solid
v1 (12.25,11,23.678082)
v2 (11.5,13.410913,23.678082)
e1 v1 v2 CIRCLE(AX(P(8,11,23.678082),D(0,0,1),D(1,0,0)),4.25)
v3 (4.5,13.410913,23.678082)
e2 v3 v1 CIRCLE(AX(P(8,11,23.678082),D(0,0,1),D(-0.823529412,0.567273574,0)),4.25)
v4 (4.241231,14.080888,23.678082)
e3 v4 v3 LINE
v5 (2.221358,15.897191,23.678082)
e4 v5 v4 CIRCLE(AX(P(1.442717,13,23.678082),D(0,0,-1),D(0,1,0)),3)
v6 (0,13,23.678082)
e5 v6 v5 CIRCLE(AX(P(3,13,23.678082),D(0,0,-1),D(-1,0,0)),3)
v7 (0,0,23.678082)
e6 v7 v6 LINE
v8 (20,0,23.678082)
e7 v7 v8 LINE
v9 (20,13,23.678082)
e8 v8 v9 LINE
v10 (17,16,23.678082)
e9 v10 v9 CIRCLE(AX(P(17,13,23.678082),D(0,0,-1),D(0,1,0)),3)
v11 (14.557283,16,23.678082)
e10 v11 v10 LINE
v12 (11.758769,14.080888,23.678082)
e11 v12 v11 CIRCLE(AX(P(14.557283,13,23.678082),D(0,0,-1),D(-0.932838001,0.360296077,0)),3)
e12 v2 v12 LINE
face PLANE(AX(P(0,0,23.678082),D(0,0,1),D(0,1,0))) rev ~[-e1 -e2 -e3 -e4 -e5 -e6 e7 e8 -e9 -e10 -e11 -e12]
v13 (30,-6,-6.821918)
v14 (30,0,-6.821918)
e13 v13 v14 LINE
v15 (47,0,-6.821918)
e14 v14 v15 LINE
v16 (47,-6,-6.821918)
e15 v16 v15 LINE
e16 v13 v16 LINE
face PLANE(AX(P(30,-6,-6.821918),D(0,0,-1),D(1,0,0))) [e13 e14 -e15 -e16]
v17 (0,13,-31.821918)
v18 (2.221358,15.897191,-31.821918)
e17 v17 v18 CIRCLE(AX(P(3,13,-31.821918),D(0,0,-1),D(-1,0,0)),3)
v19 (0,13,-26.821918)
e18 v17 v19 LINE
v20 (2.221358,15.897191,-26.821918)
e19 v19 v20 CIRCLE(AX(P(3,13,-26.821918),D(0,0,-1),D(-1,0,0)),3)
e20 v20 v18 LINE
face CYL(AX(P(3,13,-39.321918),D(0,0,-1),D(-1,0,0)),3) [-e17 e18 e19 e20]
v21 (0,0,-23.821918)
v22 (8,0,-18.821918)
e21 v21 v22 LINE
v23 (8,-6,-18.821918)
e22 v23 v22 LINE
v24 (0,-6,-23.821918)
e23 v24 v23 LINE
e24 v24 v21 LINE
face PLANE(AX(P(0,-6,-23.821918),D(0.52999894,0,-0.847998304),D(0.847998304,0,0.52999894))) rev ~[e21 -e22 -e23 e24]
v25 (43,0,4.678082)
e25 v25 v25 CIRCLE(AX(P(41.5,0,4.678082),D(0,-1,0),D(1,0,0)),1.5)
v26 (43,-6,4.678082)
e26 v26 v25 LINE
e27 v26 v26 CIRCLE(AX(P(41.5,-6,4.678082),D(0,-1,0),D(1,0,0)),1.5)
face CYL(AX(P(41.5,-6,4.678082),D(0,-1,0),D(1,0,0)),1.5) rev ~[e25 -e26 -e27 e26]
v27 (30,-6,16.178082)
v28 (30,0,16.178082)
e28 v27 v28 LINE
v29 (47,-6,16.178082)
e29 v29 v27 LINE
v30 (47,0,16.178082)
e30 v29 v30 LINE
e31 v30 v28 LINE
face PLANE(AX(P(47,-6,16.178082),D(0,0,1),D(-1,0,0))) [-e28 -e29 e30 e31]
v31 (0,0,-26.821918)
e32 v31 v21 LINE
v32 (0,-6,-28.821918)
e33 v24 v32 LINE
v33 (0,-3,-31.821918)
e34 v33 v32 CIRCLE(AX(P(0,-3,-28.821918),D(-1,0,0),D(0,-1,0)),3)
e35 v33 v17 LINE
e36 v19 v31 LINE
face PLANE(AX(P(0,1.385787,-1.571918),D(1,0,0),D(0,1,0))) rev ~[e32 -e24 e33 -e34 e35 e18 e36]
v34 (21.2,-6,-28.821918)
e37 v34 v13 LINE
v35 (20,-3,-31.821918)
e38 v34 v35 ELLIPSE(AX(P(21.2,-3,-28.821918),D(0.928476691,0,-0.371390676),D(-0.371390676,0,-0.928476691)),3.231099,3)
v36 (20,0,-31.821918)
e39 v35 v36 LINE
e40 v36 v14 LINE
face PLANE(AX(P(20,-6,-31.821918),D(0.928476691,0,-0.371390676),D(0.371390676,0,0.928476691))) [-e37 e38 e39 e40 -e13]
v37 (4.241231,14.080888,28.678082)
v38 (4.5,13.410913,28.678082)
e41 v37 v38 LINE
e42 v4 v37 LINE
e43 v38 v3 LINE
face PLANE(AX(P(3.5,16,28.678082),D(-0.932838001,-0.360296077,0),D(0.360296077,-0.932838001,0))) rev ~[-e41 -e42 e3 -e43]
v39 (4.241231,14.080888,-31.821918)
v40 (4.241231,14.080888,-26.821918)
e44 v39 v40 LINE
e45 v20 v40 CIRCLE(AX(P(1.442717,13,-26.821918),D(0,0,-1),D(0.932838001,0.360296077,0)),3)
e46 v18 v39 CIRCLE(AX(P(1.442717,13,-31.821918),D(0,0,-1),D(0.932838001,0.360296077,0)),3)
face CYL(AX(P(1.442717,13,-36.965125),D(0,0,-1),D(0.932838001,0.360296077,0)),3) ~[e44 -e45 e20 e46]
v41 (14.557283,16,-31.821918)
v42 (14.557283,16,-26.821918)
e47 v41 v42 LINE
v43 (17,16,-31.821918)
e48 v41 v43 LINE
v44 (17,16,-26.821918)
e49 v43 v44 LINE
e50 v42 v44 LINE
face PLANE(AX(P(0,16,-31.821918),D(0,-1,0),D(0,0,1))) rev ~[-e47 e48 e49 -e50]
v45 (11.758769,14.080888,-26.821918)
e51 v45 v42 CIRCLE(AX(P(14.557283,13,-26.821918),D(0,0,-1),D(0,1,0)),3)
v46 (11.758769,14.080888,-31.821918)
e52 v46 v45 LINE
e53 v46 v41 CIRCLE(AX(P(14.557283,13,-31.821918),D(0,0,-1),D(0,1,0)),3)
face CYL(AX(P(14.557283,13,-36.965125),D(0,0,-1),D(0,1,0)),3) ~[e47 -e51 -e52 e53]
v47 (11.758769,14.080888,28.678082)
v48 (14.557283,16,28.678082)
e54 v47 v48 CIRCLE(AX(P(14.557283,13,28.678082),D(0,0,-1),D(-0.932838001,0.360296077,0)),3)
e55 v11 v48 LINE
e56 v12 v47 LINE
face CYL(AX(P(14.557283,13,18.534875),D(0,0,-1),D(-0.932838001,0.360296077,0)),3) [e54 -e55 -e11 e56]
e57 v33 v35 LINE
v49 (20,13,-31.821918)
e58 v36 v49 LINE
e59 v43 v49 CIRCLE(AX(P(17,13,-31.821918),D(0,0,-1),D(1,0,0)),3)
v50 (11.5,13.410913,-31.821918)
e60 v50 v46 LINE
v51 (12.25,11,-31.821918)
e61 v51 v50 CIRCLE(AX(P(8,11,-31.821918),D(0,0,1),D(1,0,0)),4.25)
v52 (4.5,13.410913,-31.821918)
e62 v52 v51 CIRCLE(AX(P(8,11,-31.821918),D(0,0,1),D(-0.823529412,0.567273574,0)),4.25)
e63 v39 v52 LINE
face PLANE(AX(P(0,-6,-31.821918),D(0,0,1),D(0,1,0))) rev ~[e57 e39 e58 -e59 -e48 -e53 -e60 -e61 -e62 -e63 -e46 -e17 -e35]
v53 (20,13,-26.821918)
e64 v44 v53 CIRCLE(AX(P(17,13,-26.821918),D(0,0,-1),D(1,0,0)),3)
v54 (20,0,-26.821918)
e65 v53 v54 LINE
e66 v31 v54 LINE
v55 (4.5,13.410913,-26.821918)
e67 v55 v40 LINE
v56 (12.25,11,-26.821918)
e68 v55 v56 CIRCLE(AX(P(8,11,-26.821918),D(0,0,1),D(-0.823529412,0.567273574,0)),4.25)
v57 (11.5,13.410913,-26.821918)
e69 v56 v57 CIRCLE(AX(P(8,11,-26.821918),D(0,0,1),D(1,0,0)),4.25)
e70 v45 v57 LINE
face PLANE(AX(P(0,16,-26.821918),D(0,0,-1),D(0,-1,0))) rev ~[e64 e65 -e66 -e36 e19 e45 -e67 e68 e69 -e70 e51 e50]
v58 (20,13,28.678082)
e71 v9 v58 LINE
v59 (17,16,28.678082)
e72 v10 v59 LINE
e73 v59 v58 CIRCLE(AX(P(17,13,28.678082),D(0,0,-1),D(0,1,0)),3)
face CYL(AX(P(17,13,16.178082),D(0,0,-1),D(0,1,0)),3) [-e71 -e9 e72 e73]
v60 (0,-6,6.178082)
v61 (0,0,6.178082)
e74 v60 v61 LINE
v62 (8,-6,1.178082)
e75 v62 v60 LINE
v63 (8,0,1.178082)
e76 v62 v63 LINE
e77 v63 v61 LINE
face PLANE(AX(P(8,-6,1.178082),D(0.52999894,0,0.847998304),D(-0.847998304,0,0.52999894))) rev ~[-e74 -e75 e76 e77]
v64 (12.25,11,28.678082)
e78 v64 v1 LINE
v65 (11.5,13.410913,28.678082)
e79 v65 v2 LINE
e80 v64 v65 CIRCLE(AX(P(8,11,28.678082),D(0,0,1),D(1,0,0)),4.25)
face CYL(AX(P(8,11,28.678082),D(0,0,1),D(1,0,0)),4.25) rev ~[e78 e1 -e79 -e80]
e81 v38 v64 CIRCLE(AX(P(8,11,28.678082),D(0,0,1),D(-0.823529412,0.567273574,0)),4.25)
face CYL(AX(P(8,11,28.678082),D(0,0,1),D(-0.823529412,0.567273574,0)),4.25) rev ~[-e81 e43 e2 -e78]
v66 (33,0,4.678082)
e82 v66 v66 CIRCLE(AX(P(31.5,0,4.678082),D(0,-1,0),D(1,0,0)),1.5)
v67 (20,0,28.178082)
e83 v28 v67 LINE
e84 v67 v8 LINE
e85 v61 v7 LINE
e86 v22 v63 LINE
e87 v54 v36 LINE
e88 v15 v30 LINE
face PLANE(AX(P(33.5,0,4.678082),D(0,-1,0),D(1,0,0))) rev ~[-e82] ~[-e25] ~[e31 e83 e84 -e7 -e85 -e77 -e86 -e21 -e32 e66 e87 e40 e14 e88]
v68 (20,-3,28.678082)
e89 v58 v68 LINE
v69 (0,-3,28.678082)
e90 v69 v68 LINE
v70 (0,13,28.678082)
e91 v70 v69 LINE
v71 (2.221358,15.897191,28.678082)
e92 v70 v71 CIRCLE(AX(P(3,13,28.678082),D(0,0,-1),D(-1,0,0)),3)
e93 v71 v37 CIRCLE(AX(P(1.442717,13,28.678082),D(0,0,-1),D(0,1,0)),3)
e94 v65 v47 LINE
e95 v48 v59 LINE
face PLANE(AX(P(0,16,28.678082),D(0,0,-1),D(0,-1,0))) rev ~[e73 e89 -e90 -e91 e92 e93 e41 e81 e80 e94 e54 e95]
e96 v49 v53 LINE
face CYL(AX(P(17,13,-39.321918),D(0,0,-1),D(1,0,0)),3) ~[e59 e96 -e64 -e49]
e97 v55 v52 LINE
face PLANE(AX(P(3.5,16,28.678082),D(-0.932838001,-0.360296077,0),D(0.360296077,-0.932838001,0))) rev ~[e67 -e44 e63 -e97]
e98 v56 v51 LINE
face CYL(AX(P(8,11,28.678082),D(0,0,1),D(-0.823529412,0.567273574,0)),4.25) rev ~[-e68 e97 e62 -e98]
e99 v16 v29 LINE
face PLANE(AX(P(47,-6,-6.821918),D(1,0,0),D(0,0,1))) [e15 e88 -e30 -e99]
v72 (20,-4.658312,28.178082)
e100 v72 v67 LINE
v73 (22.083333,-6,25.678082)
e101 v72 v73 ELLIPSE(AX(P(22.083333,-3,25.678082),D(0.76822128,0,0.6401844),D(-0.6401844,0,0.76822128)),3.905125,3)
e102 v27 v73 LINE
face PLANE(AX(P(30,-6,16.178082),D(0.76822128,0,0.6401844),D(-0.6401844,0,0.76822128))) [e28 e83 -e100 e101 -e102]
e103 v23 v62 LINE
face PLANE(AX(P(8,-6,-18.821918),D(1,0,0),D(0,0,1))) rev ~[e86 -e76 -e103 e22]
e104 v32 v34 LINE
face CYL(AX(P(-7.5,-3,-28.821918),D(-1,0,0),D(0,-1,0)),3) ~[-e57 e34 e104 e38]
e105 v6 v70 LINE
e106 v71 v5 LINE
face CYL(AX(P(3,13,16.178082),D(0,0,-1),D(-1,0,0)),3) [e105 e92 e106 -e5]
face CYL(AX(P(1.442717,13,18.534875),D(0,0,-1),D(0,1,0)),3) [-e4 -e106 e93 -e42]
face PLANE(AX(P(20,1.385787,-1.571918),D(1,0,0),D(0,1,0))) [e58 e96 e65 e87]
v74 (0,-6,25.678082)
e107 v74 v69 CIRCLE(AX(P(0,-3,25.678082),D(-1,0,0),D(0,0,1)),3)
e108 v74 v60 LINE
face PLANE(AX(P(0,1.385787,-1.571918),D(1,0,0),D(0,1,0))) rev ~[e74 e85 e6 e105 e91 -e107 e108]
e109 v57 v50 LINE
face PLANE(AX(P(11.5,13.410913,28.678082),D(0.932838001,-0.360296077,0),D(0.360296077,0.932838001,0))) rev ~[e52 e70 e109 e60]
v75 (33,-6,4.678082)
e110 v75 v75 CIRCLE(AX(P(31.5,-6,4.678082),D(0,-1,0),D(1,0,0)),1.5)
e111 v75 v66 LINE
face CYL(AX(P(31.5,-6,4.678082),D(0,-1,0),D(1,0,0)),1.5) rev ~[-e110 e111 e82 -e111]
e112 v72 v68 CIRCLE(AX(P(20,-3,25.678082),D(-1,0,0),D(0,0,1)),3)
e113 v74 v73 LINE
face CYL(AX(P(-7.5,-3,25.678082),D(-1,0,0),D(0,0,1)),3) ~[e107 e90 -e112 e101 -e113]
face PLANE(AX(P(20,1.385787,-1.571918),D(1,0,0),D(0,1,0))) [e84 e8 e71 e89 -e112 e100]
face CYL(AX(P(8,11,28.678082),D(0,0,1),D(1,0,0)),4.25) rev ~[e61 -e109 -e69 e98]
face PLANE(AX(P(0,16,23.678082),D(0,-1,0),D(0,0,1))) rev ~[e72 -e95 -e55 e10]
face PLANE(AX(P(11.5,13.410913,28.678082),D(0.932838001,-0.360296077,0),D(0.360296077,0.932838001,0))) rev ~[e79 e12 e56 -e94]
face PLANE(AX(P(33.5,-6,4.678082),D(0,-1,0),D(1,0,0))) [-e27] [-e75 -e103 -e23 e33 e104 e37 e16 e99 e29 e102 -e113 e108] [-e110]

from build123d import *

# Parameters (mm, degrees)
F1_DEPTH    = 20
F3_DEPTH    = 70
F4_R        = 1.5
F5_DEPTH    = 6
F6_T1_DEPTH = 20
F6_T3_DEPTH = 20
F6_T5_DEPTH = 15.2864150343
F6_T7_DEPTH = 15.2864150343
F6_T9_DEPTH = 35
F8_DEPTH    = 25
F9_DEPTH    = 25


# Not quite as in the source:
# - a fillet or chamfer that OpenCascade refuses, or shapes differently, is made with other operations: its cross-section is extruded or revolved along the edge and cut away or added


with BuildPart() as f1:
    # F0 (on Right) → F1 (new body)
    with BuildSketch(Plane.YZ):
        Polygon((0, -26.8219177697), (0, 23.6780822303), (16, 23.6780822303), (16, 28.6780822303), (-6, 28.6780822303), (-6, -31.8219177697), (16, -31.8219177697), (16, -26.8219177697), align=None)
    extrude(amount=F1_DEPTH)

    # F2 (on face) → F3 (cut)
    with BuildSketch(Plane.XY.offset(28.6780822303)):
        with BuildLine():
            ThreePointArc((4.5, 13.4109126902), (6.7375618827, 6.9418292298), (12.25, 11))
            ThreePointArc((12.25, 11), (12.0581707702, 12.2624381173), (11.5, 13.4109126902))
            ThreePointArc((11.5, 13.4109126902), (8, 15.25), (4.5, 13.4109126902))
        make_face()
        with BuildLine():
            ThreePointArc((4.5, 13.4109126902), (8, 15.25), (11.5, 13.4109126902))
            Line((11.5, 13.4109126902), (12.5, 16))
            Line((12.5, 16), (3.5, 16))
            Line((3.5, 16), (4.5, 13.4109126902))
        make_face()
    extrude(amount=-F3_DEPTH, mode=Mode.SUBTRACT)

    # F4 (on face) → F5 (join)
    with BuildSketch(Plane.XZ.offset(6)):
        Polygon((20, 16.1780822303), (20, -6.8219177697), (30, -6.8219177697), (47, -6.8219177697), (47, 16.1780822303), (30, 16.1780822303), align=None)
        with Locations((31.5, 4.6780822303)):
            Circle(F4_R, mode=Mode.SUBTRACT)
        with Locations((41.5, 4.6780822303)):
            Circle(F4_R, mode=Mode.SUBTRACT)
        Polygon((30, -6.8219177697), (20, -6.8219177697), (20, -31.8219177697), align=None)
        Polygon((20, 28.1780822303), (20, 16.1780822303), (30, 16.1780822303), align=None)
    extrude(amount=-F5_DEPTH)

    # F6: fillet of radius 3 on 10 edges, made by hand

    # F6_s2 → F6_t1 (cut)
    with BuildSketch(Plane.XY.offset(16.1780822303)):
        with BuildLine():
            ThreePointArc((17, 16), (19.1213203436, 15.1213203436), (20, 13))
            Line((20, 13), (20, 16))
            Line((20, 16), (17, 16))
        make_face()
        with BuildLine():
            ThreePointArc((0, 13), (0.8786796564, 15.1213203436), (3, 16))
            Line((3, 16), (0, 16))
            Line((0, 16), (0, 13))
        make_face()
    extrude(amount=F6_T1_DEPTH, mode=Mode.SUBTRACT)

    # F6_s4 → F6_t3 (cut)
    with BuildSketch(Plane.XY.offset(-39.3219177697)):
        with BuildLine():
            ThreePointArc((20, 13), (19.1213203436, 15.1213203436), (17, 16))
            Line((17, 16), (20, 16))
            Line((20, 16), (20, 13))
        make_face()
        with BuildLine():
            ThreePointArc((0, 13), (0.8786796564, 15.1213203436), (3, 16))
            Line((3, 16), (0, 16))
            Line((0, 16), (0, 13))
        make_face()
    extrude(amount=F6_T3_DEPTH, mode=Mode.SUBTRACT)

    # F6_s6 → F6_t5 (cut)
    with BuildSketch(Plane.XY.offset(18.5348747132)):
        with BuildLine():
            ThreePointArc((11.7587690029, 14.0808882317), (12.8606193241, 15.4741326455), (14.5572830069, 16))
            Line((14.5572830069, 16), (12.5, 16))
            Line((12.5, 16), (11.7587690029, 14.0808882317))
        make_face()
        with BuildLine():
            ThreePointArc((1.4427169931, 16), (3.1393806759, 15.4741326455), (4.2412309971, 14.0808882317))
            Line((4.2412309971, 14.0808882317), (3.5, 16))
            Line((3.5, 16), (1.4427169931, 16))
        make_face()
    extrude(amount=F6_T5_DEPTH, mode=Mode.SUBTRACT)

    # F6_s8 → F6_t7 (cut)
    with BuildSketch(Plane.XY.offset(-36.9651252868)):
        with BuildLine():
            ThreePointArc((14.5572830069, 16), (12.8606193241, 15.4741326455), (11.7587690029, 14.0808882317))
            Line((11.7587690029, 14.0808882317), (12.5, 16))
            Line((12.5, 16), (14.5572830069, 16))
        make_face()
        with BuildLine():
            ThreePointArc((4.2412309971, 14.0808882317), (3.1393806759, 15.4741326455), (1.4427169931, 16))
            Line((1.4427169931, 16), (3.5, 16))
            Line((3.5, 16), (4.2412309971, 14.0808882317))
        make_face()
    extrude(amount=F6_T7_DEPTH, mode=Mode.SUBTRACT)

    # F6_s10 → F6_t9 (cut)
    with BuildSketch(Plane.YZ.offset(-7.5)):
        with BuildLine():
            ThreePointArc((-3, 28.6780822303), (-5.1213203436, 27.7994025739), (-6, 25.6780822303))
            Line((-6, 25.6780822303), (-6, 28.6780822303))
            Line((-6, 28.6780822303), (-3, 28.6780822303))
        make_face()
        with BuildLine():
            ThreePointArc((-6, -28.8219177697), (-5.1213203436, -30.9432381132), (-3, -31.8219177697))
            Line((-3, -31.8219177697), (-6, -31.8219177697))
            Line((-6, -31.8219177697), (-6, -28.8219177697))
        make_face()
    extrude(amount=F6_T9_DEPTH, mode=Mode.SUBTRACT)

    # F7 (on face) → F8 (cut)
    with BuildSketch(Plane.XZ.offset(6)):
        Polygon((0, 6.1780822303), (0, -23.8219177697), (8, -18.8219177697), (8, 1.1780822303), align=None)
    extrude(amount=-F8_DEPTH, mode=Mode.SUBTRACT)

    # F7 (on face) → F9 (cut)
    with BuildSketch(Plane.XZ.offset(6)):
        Polygon((0, 6.1780822303), (0, -23.8219177697), (8, -18.8219177697), (8, 1.1780822303), align=None)
    extrude(amount=-F9_DEPTH, mode=Mode.SUBTRACT)


solid = f1.part
